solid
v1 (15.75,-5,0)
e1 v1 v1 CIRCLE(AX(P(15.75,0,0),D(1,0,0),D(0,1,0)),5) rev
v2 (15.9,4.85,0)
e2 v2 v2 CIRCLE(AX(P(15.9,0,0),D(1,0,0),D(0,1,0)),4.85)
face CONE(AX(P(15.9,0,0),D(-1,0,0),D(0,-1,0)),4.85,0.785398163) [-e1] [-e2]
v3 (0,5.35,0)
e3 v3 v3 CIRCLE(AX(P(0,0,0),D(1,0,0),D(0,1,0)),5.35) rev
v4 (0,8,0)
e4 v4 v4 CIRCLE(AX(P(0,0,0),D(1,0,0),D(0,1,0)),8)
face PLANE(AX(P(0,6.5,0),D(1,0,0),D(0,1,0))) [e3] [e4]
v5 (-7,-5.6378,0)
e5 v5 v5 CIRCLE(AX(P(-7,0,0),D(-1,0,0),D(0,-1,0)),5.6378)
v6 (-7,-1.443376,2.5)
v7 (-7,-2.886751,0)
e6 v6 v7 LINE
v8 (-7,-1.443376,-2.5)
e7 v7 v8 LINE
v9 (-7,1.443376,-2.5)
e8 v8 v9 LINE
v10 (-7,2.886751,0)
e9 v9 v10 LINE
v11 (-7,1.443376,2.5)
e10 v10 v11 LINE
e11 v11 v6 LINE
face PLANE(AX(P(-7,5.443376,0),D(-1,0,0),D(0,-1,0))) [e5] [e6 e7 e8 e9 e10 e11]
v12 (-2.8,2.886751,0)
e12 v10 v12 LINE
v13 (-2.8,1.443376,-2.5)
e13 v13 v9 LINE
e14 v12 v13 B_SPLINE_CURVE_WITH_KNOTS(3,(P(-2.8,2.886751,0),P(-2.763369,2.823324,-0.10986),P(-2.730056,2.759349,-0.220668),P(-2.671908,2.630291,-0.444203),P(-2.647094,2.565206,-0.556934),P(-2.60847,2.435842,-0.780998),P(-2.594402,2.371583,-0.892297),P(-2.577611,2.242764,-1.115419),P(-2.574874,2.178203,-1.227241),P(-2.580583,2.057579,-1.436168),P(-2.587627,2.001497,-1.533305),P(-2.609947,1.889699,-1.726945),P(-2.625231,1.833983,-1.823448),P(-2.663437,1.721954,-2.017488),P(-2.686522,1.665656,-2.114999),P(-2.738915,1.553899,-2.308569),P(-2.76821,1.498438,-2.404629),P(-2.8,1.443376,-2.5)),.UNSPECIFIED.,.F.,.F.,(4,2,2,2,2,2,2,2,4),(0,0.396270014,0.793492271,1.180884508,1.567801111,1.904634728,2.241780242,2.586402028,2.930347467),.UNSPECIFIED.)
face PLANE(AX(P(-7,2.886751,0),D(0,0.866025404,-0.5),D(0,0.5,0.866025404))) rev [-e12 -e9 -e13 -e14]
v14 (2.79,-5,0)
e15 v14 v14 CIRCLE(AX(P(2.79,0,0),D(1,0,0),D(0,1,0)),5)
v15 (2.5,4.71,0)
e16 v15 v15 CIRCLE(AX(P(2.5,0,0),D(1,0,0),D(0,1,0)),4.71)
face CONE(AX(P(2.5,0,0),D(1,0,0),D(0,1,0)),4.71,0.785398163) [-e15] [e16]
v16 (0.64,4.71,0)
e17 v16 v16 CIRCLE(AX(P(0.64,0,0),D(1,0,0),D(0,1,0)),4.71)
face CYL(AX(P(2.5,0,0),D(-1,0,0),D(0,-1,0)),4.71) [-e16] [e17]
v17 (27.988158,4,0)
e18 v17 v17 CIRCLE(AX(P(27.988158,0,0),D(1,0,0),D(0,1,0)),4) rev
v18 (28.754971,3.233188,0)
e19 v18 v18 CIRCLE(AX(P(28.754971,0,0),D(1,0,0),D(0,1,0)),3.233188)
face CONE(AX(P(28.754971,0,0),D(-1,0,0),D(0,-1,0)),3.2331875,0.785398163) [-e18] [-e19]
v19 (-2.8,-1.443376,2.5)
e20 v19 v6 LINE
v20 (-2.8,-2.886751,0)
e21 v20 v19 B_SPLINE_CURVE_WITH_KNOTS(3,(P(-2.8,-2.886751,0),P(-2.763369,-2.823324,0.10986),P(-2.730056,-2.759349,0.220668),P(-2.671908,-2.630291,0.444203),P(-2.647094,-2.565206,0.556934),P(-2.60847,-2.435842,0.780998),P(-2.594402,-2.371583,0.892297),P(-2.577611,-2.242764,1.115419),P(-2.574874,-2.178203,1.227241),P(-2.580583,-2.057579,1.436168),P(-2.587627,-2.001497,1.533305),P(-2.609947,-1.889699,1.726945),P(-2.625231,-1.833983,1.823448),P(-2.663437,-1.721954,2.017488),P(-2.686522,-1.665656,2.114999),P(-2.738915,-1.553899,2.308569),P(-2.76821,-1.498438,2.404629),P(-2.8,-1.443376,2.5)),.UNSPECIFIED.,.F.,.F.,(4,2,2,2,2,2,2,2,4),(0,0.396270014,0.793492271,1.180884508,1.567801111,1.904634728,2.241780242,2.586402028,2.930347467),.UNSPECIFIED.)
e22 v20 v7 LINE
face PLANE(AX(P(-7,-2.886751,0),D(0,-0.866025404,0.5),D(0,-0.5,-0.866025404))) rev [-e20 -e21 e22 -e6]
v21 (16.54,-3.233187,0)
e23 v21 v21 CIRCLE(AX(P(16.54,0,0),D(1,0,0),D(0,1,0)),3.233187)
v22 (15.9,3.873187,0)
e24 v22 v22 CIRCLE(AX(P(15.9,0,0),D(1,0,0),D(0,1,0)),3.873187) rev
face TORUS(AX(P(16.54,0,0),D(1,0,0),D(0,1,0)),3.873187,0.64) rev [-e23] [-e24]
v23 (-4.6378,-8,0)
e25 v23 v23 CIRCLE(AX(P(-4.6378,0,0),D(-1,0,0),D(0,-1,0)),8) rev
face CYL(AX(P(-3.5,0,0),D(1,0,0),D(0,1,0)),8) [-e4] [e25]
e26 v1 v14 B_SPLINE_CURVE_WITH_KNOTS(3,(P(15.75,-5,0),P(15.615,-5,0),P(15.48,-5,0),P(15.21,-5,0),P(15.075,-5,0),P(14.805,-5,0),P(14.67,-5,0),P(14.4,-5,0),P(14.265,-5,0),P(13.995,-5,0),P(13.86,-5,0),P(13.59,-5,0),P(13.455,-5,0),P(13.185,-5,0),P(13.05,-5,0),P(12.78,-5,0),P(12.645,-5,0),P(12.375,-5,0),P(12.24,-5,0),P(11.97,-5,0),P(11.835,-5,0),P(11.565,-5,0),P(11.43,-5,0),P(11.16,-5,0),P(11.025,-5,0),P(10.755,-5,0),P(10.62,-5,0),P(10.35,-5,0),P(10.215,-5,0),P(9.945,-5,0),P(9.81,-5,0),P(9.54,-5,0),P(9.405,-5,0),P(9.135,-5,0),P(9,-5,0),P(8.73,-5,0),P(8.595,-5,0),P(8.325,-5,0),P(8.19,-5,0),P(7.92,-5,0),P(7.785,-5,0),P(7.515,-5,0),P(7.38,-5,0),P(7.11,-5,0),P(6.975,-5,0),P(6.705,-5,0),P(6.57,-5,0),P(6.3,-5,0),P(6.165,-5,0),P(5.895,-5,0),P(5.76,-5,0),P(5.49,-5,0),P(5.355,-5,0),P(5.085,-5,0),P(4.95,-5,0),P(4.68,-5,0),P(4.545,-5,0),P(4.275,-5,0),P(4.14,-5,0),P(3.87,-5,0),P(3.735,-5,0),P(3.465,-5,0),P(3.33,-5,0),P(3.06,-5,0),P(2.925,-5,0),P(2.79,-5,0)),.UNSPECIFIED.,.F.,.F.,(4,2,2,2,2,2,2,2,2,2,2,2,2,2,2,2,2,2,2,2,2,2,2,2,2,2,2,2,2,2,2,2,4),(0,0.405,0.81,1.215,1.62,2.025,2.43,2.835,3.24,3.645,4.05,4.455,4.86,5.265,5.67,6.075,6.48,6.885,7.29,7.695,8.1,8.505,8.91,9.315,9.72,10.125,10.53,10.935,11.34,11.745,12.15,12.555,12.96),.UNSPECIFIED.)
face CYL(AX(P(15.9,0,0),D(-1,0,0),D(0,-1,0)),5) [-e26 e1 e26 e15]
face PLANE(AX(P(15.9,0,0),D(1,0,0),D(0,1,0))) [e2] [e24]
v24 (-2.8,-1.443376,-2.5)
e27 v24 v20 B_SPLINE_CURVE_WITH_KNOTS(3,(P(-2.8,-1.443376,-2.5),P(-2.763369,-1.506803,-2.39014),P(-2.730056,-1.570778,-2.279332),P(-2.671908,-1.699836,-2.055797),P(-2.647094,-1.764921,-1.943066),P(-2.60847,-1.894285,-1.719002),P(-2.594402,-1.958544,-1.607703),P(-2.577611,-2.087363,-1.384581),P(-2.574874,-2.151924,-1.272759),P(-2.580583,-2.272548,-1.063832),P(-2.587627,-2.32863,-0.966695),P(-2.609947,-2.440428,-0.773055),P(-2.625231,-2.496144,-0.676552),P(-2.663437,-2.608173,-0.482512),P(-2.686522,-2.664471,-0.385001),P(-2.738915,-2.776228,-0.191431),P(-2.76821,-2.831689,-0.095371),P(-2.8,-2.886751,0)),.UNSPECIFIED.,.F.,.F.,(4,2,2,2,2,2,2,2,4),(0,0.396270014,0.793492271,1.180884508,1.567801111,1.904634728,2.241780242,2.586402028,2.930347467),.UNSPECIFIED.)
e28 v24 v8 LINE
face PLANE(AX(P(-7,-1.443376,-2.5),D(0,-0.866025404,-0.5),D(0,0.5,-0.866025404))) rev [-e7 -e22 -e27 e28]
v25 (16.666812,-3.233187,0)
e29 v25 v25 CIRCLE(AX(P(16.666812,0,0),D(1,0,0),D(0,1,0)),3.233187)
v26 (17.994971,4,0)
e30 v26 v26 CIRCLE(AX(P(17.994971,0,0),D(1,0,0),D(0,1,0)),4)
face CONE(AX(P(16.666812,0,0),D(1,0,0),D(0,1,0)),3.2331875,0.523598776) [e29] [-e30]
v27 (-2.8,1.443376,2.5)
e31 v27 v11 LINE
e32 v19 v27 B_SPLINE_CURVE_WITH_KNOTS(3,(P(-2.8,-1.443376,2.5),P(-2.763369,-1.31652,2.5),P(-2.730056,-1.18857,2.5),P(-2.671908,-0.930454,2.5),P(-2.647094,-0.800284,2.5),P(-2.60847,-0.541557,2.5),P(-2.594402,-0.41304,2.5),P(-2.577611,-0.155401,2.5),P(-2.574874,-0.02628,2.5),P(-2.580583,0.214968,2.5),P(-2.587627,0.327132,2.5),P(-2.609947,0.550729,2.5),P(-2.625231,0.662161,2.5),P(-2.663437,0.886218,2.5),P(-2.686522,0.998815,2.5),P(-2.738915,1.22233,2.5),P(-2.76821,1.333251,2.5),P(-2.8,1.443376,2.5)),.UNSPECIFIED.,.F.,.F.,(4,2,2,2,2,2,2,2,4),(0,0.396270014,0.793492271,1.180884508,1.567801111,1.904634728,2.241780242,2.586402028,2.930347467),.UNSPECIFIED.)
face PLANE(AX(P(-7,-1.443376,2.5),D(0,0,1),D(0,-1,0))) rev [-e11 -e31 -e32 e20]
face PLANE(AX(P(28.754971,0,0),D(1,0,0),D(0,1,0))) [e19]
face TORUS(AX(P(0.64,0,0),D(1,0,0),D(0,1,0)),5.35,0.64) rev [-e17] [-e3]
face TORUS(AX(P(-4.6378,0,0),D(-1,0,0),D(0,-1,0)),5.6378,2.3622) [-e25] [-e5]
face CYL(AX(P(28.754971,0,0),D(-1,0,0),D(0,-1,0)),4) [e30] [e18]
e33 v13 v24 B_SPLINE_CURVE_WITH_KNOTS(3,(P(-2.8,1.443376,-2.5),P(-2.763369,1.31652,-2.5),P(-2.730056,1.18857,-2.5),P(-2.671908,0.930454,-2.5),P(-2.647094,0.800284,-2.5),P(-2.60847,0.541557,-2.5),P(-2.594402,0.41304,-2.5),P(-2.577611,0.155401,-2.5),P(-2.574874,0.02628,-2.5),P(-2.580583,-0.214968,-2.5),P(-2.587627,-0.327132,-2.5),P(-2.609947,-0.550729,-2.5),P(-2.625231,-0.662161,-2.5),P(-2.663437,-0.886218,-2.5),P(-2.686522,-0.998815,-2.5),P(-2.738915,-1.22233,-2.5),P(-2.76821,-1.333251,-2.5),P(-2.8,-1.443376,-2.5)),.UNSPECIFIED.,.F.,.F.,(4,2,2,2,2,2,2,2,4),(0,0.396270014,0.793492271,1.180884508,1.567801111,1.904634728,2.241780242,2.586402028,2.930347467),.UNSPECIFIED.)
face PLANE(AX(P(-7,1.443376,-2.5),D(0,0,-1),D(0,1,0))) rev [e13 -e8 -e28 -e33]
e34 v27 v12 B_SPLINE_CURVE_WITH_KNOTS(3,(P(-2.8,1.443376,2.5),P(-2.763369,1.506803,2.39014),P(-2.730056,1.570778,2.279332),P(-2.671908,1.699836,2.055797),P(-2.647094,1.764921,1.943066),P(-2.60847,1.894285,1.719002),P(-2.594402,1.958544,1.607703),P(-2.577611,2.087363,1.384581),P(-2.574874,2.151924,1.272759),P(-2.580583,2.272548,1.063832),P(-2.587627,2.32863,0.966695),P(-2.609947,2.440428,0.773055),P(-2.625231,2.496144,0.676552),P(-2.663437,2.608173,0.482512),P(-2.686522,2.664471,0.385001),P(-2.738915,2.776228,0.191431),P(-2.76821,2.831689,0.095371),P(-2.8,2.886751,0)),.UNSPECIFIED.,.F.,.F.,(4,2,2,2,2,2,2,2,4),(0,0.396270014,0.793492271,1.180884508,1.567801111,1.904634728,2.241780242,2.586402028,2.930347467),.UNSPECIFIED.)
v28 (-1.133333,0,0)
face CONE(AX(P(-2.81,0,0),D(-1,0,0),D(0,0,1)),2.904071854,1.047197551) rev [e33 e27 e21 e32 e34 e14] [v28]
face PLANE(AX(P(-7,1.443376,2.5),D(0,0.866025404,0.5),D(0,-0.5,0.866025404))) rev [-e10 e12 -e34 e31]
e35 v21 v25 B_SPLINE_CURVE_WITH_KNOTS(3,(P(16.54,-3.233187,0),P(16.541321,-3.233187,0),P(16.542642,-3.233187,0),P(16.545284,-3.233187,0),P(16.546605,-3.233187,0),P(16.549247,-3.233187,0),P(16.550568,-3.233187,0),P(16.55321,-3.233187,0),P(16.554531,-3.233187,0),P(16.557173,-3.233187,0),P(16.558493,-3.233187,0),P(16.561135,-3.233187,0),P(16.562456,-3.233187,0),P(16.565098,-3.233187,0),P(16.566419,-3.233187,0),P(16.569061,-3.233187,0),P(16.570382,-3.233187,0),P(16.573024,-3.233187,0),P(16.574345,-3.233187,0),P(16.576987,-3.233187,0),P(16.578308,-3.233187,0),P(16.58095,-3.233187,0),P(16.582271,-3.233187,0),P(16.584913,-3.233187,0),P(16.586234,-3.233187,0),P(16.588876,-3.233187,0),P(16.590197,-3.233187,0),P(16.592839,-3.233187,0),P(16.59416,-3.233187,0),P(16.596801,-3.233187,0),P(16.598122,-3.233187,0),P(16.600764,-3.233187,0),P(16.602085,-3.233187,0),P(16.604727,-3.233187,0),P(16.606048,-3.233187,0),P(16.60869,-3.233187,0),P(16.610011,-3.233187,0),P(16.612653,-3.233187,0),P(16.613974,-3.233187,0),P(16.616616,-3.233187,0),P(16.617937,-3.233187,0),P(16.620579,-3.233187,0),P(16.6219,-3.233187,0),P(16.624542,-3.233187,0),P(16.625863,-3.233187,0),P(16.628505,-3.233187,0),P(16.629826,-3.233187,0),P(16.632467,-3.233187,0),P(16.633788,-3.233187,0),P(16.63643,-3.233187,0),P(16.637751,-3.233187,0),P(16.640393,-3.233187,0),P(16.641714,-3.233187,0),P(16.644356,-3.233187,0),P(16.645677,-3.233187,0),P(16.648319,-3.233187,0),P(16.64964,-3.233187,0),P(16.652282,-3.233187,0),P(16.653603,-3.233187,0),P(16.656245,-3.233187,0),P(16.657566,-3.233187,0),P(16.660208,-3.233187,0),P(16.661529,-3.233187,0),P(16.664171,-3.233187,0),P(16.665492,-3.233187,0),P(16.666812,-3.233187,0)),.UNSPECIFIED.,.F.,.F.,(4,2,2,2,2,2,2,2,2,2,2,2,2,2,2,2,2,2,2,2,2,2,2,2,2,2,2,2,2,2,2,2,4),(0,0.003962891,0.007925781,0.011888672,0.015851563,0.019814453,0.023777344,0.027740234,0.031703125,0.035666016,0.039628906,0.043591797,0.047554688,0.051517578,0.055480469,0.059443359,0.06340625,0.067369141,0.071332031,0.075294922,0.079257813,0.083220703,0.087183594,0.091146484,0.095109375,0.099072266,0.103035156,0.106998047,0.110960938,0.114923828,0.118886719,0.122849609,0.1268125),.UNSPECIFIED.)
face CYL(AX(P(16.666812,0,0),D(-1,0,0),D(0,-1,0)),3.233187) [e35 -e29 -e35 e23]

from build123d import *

# Parameters (mm, degrees)
DODANIE_WYCI_GNI_CIE1_START       = -7
DODANIE_WYCI_GNI_CIE1_OUTLINE_R   = 8
DODANIE_WYCI_GNI_CIE1_DEPTH       = 7
DODANIE_WYCI_GNI_CIE1_START_2     = -1.133333233
DODANIE_WYCI_GNI_CIE1_2_OUTLINE_R = 4.71
DODANIE_WYCI_GNI_CIE1_2_DEPTH     = 3.633333233
SZKIC2_R                          = 4.71
DODANIE_WYCI_GNI_CIE2_DEPTH       = 0.29
DODANIE_WYCI_GNI_CIE2_DRAFT       = -45
SZKIC3_R                          = 5
DODANIE_WYCI_GNI_CIE3_DEPTH       = 13.11
SZKIC4_R                          = 3.2331875
DODANIE_WYCI_GNI_CIE4_DEPTH       = 0.7668125
SZKIC5_R                          = 3.2331875
DODANIE_WYCI_GNI_CIE5_DEPTH       = 1.32815821
DODANIE_WYCI_GNI_CIE5_DRAFT       = -30
SZKIC6_R                          = 4
DODANIE_WYCI_GNI_CIE6_DEPTH       = 10.76
SFAZOWANIE1_SIZE                  = 0.7668125
SFAZOWANIE2_SIZE                  = 0.15
ZAOKR_GLENIE1_R                   = 0.64
ZAOKR_GLENIE2_R                   = 2.3622


with BuildPart() as part:
    # Dodanie-wyciągnięcie1: read off the stored shape, not the designer's step
    # Dodanie-wyciągnięcie1 outline → Dodanie-wyciągnięcie1 (new body)
    with BuildSketch(Plane(origin=(0, 0, 0), x_dir=(0, 0, -1), z_dir=(1, 0, 0)).offset(DODANIE_WYCI_GNI_CIE1_START)):
        Circle(DODANIE_WYCI_GNI_CIE1_OUTLINE_R)
        Polygon((0, 2.886751346), (2.5, 1.443375673), (2.5, -1.443375673), (0, -2.886751346), (-2.5, -1.443375673), (-2.5, 1.443375673), align=None, mode=Mode.SUBTRACT)
    extrude(amount=DODANIE_WYCI_GNI_CIE1_DEPTH)

    # Dodanie-wyci_gni_cie1 2 outline → Dodanie-wyci_gni_cie1 2 (add)
    with BuildSketch(Plane(origin=(0, 0, 0), x_dir=(0, 0, -1), z_dir=(1, 0, 0)).offset(DODANIE_WYCI_GNI_CIE1_START_2)):
        Circle(DODANIE_WYCI_GNI_CIE1_2_OUTLINE_R)
    extrude(amount=DODANIE_WYCI_GNI_CIE1_2_DEPTH)

    # Dodanie-wyci_gni_cie1 3 outline → Dodanie-wyci_gni_cie1 3 (revolve)
    with BuildSketch(Plane.YX):
        Polygon((2.886751346, -1.133333233), (0, -1.133333233), (2.886751346, -2.8), align=None)
    revolve(axis=Axis((0, 0, 0), (1, 0, 0)))


with BuildPart() as dodanie_wyci_gni_cie2_tool:
    # Szkic2 → Dodanie-wyciągnięcie2 (with draft: the straight prism first)
    with BuildSketch(Plane(origin=(2.5, 0, 0), x_dir=(0, 0, -1), z_dir=(1, 0, 0))):
        with Locations(Location((0, 0, 0), (0, 0, 90))):
            Circle(SZKIC2_R)
    extrude(amount=DODANIE_WYCI_GNI_CIE2_DEPTH)
    # Dodanie-wyciągnięcie2: the draft: its side faces are tilted about the plane it starts from
    dodanie_wyci_gni_cie2_sides = [dodanie_wyci_gni_cie2_tool.faces().sort_by_distance(p)[0] for p in [
        (2.645, -4.71, 0),
    ]]
    draft(dodanie_wyci_gni_cie2_sides, Plane(origin=(2.5, 0, 0), x_dir=(0, 0, -1), z_dir=(1, 0, 0)), DODANIE_WYCI_GNI_CIE2_DRAFT)


with BuildPart() as part_1:
    add(part.part)

    # Dodanie-wyciągnięcie2: add dodanie_wyci_gni_cie2_tool
    add(dodanie_wyci_gni_cie2_tool.part)

    # Szkic3 → Dodanie-wyciągnięcie3 (add)
    with BuildSketch(Plane(origin=(2.79, 0, 0), x_dir=(0, 0, -1), z_dir=(1, 0, 0))):
        with Locations(Location((0, 0, 0), (0, 0, 270))):
            Circle(SZKIC3_R)
    extrude(amount=DODANIE_WYCI_GNI_CIE3_DEPTH)

    # Szkic4 → Dodanie-wyciągnięcie4 (add)
    with BuildSketch(Plane(origin=(15.9, 0, 0), x_dir=(0, 0, -1), z_dir=(1, 0, 0))):
        with Locations(Location((0, 0, 0), (0, 0, 270))):
            Circle(SZKIC4_R)
    extrude(amount=DODANIE_WYCI_GNI_CIE4_DEPTH)


with BuildPart() as dodanie_wyci_gni_cie5_tool:
    # Szkic5 → Dodanie-wyciągnięcie5 (with draft: the straight prism first)
    with BuildSketch(Plane(origin=(16.6668125, 0, 0), x_dir=(0, 0, -1), z_dir=(1, 0, 0))):
        with Locations(Location((0, 0, 0), (0, 0, 270))):
            Circle(SZKIC5_R)
    extrude(amount=DODANIE_WYCI_GNI_CIE5_DEPTH)
    # Dodanie-wyciągnięcie5: the draft: its side faces are tilted about the plane it starts from
    dodanie_wyci_gni_cie5_sides = [dodanie_wyci_gni_cie5_tool.faces().sort_by_distance(p)[0] for p in [
        (17.330891605, 3.2331875, 0),
    ]]
    draft(dodanie_wyci_gni_cie5_sides, Plane(origin=(16.6668125, 0, 0), x_dir=(0, 0, -1), z_dir=(1, 0, 0)), DODANIE_WYCI_GNI_CIE5_DRAFT)


with BuildPart() as part_2:
    add(part_1.part)

    # Dodanie-wyciągnięcie5: add dodanie_wyci_gni_cie5_tool
    add(dodanie_wyci_gni_cie5_tool.part)

    # Szkic6 → Dodanie-wyciągnięcie6 (add)
    with BuildSketch(Plane(origin=(17.99497071, 0, 0), x_dir=(0, 0, -1), z_dir=(1, 0, 0))):
        with Locations(Location((0, 0, 0), (0, 0, 90))):
            Circle(SZKIC6_R)
    extrude(amount=DODANIE_WYCI_GNI_CIE6_DEPTH)

    # Sfazowanie1
    sfazowanie1_edges = [part_2.edges().sort_by_distance(p)[0] for p in [
        (28.75497071, -4, 0),
    ]]
    chamfer(sfazowanie1_edges, length=SFAZOWANIE1_SIZE)

    # Sfazowanie2
    sfazowanie2_edges = [part_2.edges().sort_by_distance(p)[0] for p in [
        (15.9, 5, 0),
    ]]
    chamfer(sfazowanie2_edges, length=SFAZOWANIE2_SIZE)

    # Zaokrąglenie1
    zaokr_glenie1_edges = [part_2.edges().sort_by_distance(p)[0] for p in [
        (0, 0, 4.71),
        (15.9, 3.2331875, 0),
    ]]
    fillet(zaokr_glenie1_edges, radius=ZAOKR_GLENIE1_R)

    # Zaokrąglenie2
    zaokr_glenie2_edges = [part_2.edges().sort_by_distance(p)[0] for p in [
        (-7, 0, 8),
    ]]
    fillet(zaokr_glenie2_edges, radius=ZAOKR_GLENIE2_R)


solid = part_2.part
